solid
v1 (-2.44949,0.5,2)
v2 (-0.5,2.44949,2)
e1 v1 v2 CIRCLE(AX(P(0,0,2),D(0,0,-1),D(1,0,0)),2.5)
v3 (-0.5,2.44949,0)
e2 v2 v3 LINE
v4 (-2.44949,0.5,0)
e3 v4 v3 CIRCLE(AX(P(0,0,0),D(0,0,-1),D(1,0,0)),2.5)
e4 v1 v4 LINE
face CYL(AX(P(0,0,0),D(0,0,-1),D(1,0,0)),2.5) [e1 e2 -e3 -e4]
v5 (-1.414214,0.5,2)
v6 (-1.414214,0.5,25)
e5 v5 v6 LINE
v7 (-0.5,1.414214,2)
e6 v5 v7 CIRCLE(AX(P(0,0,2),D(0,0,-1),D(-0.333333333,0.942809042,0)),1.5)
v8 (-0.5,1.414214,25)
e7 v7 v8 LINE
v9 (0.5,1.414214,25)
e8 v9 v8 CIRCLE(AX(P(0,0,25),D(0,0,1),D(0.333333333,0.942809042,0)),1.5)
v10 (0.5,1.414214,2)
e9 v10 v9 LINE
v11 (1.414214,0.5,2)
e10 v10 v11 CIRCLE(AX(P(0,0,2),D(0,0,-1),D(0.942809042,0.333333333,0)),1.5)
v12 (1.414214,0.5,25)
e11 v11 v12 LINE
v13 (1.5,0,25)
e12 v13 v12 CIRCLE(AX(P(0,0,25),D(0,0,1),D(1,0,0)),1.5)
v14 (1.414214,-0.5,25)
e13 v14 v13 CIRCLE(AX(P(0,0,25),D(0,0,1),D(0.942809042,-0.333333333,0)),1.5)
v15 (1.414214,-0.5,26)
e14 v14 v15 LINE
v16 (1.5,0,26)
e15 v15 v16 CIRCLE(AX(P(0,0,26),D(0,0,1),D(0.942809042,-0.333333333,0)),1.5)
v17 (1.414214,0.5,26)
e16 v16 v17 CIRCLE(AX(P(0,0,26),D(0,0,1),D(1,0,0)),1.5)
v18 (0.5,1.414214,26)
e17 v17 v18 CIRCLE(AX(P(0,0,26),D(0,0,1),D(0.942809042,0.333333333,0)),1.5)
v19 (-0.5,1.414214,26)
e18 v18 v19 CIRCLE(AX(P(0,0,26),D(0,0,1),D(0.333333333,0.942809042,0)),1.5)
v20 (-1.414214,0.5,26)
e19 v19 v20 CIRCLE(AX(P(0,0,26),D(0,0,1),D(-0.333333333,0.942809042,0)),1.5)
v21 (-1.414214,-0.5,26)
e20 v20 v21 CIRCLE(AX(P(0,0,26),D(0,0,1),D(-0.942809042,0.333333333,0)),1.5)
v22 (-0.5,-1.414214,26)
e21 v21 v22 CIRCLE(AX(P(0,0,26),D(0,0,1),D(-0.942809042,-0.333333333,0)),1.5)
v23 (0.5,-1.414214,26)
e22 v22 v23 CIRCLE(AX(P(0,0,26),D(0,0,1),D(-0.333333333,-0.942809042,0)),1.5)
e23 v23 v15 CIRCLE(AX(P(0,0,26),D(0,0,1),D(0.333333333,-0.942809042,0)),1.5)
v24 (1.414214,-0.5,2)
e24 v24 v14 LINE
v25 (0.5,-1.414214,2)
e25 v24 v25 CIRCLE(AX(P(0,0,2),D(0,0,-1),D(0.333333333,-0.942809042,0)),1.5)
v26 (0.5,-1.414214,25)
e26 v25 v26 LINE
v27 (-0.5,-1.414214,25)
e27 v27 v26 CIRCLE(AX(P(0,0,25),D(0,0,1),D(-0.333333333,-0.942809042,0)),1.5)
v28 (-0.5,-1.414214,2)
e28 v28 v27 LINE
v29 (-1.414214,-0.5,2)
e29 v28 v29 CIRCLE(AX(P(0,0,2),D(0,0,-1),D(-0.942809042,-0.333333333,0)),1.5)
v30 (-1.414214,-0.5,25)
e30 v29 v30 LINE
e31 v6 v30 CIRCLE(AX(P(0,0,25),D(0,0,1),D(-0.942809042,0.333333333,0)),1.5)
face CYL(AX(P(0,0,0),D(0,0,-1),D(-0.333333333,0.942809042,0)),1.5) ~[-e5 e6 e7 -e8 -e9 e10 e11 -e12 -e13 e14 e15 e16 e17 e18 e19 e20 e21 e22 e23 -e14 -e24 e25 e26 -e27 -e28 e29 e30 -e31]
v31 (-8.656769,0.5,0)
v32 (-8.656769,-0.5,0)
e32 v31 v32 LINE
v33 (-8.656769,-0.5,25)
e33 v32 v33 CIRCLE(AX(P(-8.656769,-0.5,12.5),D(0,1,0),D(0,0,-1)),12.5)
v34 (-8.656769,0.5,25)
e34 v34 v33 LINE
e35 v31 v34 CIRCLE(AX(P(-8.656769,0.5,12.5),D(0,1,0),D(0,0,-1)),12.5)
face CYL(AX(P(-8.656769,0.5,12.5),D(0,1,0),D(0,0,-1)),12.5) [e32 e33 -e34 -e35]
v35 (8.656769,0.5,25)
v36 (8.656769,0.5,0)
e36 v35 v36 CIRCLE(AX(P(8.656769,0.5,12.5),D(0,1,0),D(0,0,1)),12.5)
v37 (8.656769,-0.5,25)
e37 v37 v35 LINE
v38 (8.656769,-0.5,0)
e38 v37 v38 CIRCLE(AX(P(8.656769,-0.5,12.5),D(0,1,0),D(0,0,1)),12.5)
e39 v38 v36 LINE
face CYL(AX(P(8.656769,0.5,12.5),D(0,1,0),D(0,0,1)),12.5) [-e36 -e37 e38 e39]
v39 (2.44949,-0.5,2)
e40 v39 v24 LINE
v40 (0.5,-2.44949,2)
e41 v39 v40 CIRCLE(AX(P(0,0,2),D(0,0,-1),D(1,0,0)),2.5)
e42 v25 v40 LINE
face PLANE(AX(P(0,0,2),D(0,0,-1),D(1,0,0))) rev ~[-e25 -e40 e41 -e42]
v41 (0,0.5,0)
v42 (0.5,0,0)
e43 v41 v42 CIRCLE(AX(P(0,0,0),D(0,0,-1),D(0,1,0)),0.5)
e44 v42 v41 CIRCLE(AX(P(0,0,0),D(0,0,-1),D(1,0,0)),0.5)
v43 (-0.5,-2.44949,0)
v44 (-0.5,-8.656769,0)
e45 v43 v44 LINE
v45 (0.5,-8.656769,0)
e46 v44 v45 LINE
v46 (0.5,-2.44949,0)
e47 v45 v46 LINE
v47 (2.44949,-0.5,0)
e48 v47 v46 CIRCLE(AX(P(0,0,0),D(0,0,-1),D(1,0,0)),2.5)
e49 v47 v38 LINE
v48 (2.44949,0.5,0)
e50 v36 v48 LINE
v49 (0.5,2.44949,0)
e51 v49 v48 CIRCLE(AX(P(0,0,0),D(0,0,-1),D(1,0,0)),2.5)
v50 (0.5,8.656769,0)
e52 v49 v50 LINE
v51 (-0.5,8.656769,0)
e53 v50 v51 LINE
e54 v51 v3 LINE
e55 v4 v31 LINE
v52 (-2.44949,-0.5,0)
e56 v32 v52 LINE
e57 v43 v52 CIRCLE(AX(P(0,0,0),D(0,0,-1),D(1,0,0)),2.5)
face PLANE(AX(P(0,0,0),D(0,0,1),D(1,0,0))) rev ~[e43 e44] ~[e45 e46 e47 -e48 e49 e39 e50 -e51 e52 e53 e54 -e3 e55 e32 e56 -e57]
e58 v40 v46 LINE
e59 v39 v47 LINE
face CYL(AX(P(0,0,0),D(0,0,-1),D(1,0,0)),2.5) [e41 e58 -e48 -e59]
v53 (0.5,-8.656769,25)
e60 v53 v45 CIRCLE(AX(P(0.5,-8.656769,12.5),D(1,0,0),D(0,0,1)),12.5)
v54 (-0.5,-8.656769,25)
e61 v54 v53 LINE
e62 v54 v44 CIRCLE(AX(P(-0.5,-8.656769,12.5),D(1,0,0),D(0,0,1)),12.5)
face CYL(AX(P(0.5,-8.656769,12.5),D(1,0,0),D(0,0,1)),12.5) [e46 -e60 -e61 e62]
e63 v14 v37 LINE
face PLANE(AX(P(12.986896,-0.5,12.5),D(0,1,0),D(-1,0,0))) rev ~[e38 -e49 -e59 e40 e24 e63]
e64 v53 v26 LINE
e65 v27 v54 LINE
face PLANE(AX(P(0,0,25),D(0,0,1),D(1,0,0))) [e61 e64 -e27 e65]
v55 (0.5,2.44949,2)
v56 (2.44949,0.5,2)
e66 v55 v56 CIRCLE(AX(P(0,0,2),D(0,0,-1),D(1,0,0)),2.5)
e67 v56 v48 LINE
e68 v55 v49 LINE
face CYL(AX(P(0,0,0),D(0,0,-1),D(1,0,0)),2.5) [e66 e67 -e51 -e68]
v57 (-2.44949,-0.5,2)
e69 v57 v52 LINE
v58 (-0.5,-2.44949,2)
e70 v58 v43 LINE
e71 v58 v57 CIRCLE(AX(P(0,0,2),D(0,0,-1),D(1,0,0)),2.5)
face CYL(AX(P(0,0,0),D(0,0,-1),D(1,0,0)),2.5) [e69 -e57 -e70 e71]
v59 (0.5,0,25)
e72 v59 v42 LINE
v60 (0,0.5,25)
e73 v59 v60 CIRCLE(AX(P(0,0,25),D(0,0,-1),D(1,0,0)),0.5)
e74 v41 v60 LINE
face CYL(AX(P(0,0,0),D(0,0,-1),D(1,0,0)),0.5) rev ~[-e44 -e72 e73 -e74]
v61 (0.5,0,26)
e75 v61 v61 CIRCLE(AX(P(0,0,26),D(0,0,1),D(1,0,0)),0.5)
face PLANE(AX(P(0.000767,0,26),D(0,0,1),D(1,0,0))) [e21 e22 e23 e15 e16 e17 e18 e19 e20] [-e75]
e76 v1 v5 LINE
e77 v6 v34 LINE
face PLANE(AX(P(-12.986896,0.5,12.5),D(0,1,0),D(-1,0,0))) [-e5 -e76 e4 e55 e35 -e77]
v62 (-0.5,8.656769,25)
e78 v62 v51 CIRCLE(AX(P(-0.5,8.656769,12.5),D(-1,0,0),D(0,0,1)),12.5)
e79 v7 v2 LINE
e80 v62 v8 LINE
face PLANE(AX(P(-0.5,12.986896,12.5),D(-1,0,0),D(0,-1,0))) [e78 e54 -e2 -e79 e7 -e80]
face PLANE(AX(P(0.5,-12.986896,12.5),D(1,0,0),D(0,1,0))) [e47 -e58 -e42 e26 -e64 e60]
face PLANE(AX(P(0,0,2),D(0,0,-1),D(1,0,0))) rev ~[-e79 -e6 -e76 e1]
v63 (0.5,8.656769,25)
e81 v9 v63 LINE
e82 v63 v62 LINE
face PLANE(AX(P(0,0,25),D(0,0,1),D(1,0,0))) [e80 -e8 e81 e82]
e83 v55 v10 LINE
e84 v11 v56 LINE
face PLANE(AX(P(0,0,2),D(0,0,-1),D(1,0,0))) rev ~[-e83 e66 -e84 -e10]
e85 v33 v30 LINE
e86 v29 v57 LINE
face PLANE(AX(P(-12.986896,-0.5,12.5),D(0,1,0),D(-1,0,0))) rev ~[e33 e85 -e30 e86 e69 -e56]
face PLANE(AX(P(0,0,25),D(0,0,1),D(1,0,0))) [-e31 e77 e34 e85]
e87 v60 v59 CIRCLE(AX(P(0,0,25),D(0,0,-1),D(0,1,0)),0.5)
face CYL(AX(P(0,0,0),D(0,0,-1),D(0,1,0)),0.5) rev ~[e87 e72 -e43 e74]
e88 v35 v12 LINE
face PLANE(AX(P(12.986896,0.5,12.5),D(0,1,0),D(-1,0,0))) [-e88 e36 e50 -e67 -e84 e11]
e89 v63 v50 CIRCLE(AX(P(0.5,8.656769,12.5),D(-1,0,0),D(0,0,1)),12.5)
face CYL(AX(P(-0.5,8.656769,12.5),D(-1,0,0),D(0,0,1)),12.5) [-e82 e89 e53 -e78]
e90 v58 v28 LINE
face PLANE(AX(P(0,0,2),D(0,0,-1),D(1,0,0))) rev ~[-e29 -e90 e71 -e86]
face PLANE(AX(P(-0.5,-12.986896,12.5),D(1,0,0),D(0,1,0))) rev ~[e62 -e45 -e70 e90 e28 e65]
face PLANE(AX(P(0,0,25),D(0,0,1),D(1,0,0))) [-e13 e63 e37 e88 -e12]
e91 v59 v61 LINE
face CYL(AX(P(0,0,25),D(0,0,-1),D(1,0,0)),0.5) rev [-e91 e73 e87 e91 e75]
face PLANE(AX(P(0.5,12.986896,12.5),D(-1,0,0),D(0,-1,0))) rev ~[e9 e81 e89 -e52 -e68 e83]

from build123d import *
from build123d import SkipClean  # not in build123d's __all__

# Parameters (mm, degrees)
F1_DEPTH  = 25
F2_R      = 0.5
F3_DEPTH  = 1
F4_R      = 2.5
F4_R_2    = 0.5
F5_DEPTH  = 2
F7_DEPTH  = 1
F9_DEPTH  = 1
F11_DEPTH = 1
F12_DEPTH = 1
F14_DEPTH = 1


# Not quite as in the source:
# - a feature names something its author has since deleted; it is built from what else it names


with BuildPart() as f1:
    # F0 (on Top) → F1 (new body)
    with BuildSketch(Plane.XY):
        with BuildLine():
            Line((-8.65676943, -0.5), (-1.4142135624, -0.5))
            ThreePointArc((-1.4142135624, -0.5), (-1.0606601718, -1.0606601718), (-0.5, -1.4142135624))
            Line((-0.5, -1.4142135624), (-0.5, -8.65676943))
            Line((-0.5, -8.65676943), (0.5, -8.65676943))
            Line((0.5, -8.65676943), (0.5, -1.4142135624))
            ThreePointArc((0.5, -1.4142135624), (1.0606601718, -1.0606601718), (1.4142135624, -0.5))
            Line((1.4142135624, -0.5), (8.65676943, -0.5))
            Line((8.65676943, -0.5), (8.65676943, 0.5))
            Line((8.65676943, 0.5), (1.4142135624, 0.5))
            ThreePointArc((1.4142135624, 0.5), (1.0606601718, 1.0606601718), (0.5, 1.4142135624))
            Line((0.5, 1.4142135624), (0.5, 8.65676943))
            Line((0.5, 8.65676943), (-0.5, 8.65676943))
            Line((-0.5, 8.65676943), (-0.5, 1.4142135624))
            ThreePointArc((-0.5, 1.4142135624), (-1.0606601718, 1.0606601718), (-1.4142135624, 0.5))
            Line((-1.4142135624, 0.5), (-8.65676943, 0.5))
            Line((-8.65676943, 0.5), (-8.65676943, -0.5))
        make_face()
        with BuildLine():
            ThreePointArc((0, 0.5), (0.3535533906, 0.3535533906), (0.5, 0))
            ThreePointArc((0.5, 0), (-0.3535533906, -0.3535533906), (0, 0.5))
        make_face(mode=Mode.SUBTRACT)
    extrude(amount=F1_DEPTH)

    # F2 (on face) → F3 (join)
    with BuildSketch(Plane.XY.offset(25)):
        with BuildLine():
            ThreePointArc((1.4142135624, -0.5), (1.4783978395, -0.2536529681), (1.5, 0))
            ThreePointArc((1.5, 0), (1.4783978395, 0.2536529681), (1.4142135624, 0.5))
            ThreePointArc((1.4142135624, 0.5), (1.0606601718, 1.0606601718), (0.5, 1.4142135624))
            ThreePointArc((0.5, 1.4142135624), (0, 1.5), (-0.5, 1.4142135624))
            ThreePointArc((-0.5, 1.4142135624), (-1.0606601718, 1.0606601718), (-1.4142135624, 0.5))
            ThreePointArc((-1.4142135624, 0.5), (-1.5, 0), (-1.4142135624, -0.5))
            ThreePointArc((-1.4142135624, -0.5), (-1.0606601718, -1.0606601718), (-0.5, -1.4142135624))
            ThreePointArc((-0.5, -1.4142135624), (0, -1.5), (0.5, -1.4142135624))
            ThreePointArc((0.5, -1.4142135624), (1.0606601718, -1.0606601718), (1.4142135624, -0.5))
        make_face()
        Circle(F2_R, mode=Mode.SUBTRACT)
    with SkipClean():  # cleaning this boolean's faces spoils the solid; the shape is the same uncleaned
        extrude(amount=F3_DEPTH)

    # F4 (on face) → F5 (join)
    with BuildSketch(Plane(origin=(0, 0, 0), x_dir=(1, 0, 0), z_dir=(0, 0, -1))):
        Circle(F4_R)
        Circle(F4_R_2, mode=Mode.SUBTRACT)
    extrude(amount=-F5_DEPTH)

    # F6 (on face) → F7 (join)
    with BuildSketch(Plane.YZ.offset(0.5)):
        with BuildLine():
            Line((-8.65676943, 0), (-8.65676943, 25))
            ThreePointArc((-8.65676943, 25), (-21.15676943, 12.5), (-8.65676943, 0))
        make_face()
    extrude(amount=-F7_DEPTH)

    # F8 (on face) → F9 (join)
    with BuildSketch(Plane(origin=(0, 0.5, 0), x_dir=(-1, 0, 0), z_dir=(0, 1, 0))):
        with BuildLine():
            Line((8.65676943, 25), (8.65676943, 0))
            ThreePointArc((8.65676943, 0), (21.15676943, 12.5), (8.65676943, 25))
        make_face()
    extrude(amount=-F9_DEPTH)

    # F10 (on face) → F11 (join)
    with BuildSketch(Plane(origin=(-0.5, 0, 0), x_dir=(0, -1, 0), z_dir=(-1, 0, 0))):
        with BuildLine():
            Line((-8.65676943, 0), (-8.65676943, 25))
            ThreePointArc((-8.65676943, 25), (-21.15676943, 12.5), (-8.65676943, 0))
        make_face()
    extrude(amount=-F11_DEPTH)


with BuildPart() as f12:
    # F12 (new): a face of the model
    f12_faces = [f1.part.faces().sort_by_distance(p)[0] for p in [
        (5.0713936624, 0.5, 12.63302926),
    ]]
    extrude(f12_faces, amount=-F12_DEPTH)


with BuildPart() as f1_1:
    add(f1.part, clean=False)

    add(f12.part)  # F14 merges F12
    # F13 (on face) → F14 (join)
    with BuildSketch(Plane(origin=(0, 0.5, 0), x_dir=(-1, 0, 0), z_dir=(0, 1, 0))):
        with BuildLine():
            Line((-8.65676943, 0), (-8.65676943, 25))
            ThreePointArc((-8.65676943, 25), (-21.15676943, 12.5), (-8.65676943, 0))
        make_face()
    extrude(amount=-F14_DEPTH)


solid = f1_1.part
